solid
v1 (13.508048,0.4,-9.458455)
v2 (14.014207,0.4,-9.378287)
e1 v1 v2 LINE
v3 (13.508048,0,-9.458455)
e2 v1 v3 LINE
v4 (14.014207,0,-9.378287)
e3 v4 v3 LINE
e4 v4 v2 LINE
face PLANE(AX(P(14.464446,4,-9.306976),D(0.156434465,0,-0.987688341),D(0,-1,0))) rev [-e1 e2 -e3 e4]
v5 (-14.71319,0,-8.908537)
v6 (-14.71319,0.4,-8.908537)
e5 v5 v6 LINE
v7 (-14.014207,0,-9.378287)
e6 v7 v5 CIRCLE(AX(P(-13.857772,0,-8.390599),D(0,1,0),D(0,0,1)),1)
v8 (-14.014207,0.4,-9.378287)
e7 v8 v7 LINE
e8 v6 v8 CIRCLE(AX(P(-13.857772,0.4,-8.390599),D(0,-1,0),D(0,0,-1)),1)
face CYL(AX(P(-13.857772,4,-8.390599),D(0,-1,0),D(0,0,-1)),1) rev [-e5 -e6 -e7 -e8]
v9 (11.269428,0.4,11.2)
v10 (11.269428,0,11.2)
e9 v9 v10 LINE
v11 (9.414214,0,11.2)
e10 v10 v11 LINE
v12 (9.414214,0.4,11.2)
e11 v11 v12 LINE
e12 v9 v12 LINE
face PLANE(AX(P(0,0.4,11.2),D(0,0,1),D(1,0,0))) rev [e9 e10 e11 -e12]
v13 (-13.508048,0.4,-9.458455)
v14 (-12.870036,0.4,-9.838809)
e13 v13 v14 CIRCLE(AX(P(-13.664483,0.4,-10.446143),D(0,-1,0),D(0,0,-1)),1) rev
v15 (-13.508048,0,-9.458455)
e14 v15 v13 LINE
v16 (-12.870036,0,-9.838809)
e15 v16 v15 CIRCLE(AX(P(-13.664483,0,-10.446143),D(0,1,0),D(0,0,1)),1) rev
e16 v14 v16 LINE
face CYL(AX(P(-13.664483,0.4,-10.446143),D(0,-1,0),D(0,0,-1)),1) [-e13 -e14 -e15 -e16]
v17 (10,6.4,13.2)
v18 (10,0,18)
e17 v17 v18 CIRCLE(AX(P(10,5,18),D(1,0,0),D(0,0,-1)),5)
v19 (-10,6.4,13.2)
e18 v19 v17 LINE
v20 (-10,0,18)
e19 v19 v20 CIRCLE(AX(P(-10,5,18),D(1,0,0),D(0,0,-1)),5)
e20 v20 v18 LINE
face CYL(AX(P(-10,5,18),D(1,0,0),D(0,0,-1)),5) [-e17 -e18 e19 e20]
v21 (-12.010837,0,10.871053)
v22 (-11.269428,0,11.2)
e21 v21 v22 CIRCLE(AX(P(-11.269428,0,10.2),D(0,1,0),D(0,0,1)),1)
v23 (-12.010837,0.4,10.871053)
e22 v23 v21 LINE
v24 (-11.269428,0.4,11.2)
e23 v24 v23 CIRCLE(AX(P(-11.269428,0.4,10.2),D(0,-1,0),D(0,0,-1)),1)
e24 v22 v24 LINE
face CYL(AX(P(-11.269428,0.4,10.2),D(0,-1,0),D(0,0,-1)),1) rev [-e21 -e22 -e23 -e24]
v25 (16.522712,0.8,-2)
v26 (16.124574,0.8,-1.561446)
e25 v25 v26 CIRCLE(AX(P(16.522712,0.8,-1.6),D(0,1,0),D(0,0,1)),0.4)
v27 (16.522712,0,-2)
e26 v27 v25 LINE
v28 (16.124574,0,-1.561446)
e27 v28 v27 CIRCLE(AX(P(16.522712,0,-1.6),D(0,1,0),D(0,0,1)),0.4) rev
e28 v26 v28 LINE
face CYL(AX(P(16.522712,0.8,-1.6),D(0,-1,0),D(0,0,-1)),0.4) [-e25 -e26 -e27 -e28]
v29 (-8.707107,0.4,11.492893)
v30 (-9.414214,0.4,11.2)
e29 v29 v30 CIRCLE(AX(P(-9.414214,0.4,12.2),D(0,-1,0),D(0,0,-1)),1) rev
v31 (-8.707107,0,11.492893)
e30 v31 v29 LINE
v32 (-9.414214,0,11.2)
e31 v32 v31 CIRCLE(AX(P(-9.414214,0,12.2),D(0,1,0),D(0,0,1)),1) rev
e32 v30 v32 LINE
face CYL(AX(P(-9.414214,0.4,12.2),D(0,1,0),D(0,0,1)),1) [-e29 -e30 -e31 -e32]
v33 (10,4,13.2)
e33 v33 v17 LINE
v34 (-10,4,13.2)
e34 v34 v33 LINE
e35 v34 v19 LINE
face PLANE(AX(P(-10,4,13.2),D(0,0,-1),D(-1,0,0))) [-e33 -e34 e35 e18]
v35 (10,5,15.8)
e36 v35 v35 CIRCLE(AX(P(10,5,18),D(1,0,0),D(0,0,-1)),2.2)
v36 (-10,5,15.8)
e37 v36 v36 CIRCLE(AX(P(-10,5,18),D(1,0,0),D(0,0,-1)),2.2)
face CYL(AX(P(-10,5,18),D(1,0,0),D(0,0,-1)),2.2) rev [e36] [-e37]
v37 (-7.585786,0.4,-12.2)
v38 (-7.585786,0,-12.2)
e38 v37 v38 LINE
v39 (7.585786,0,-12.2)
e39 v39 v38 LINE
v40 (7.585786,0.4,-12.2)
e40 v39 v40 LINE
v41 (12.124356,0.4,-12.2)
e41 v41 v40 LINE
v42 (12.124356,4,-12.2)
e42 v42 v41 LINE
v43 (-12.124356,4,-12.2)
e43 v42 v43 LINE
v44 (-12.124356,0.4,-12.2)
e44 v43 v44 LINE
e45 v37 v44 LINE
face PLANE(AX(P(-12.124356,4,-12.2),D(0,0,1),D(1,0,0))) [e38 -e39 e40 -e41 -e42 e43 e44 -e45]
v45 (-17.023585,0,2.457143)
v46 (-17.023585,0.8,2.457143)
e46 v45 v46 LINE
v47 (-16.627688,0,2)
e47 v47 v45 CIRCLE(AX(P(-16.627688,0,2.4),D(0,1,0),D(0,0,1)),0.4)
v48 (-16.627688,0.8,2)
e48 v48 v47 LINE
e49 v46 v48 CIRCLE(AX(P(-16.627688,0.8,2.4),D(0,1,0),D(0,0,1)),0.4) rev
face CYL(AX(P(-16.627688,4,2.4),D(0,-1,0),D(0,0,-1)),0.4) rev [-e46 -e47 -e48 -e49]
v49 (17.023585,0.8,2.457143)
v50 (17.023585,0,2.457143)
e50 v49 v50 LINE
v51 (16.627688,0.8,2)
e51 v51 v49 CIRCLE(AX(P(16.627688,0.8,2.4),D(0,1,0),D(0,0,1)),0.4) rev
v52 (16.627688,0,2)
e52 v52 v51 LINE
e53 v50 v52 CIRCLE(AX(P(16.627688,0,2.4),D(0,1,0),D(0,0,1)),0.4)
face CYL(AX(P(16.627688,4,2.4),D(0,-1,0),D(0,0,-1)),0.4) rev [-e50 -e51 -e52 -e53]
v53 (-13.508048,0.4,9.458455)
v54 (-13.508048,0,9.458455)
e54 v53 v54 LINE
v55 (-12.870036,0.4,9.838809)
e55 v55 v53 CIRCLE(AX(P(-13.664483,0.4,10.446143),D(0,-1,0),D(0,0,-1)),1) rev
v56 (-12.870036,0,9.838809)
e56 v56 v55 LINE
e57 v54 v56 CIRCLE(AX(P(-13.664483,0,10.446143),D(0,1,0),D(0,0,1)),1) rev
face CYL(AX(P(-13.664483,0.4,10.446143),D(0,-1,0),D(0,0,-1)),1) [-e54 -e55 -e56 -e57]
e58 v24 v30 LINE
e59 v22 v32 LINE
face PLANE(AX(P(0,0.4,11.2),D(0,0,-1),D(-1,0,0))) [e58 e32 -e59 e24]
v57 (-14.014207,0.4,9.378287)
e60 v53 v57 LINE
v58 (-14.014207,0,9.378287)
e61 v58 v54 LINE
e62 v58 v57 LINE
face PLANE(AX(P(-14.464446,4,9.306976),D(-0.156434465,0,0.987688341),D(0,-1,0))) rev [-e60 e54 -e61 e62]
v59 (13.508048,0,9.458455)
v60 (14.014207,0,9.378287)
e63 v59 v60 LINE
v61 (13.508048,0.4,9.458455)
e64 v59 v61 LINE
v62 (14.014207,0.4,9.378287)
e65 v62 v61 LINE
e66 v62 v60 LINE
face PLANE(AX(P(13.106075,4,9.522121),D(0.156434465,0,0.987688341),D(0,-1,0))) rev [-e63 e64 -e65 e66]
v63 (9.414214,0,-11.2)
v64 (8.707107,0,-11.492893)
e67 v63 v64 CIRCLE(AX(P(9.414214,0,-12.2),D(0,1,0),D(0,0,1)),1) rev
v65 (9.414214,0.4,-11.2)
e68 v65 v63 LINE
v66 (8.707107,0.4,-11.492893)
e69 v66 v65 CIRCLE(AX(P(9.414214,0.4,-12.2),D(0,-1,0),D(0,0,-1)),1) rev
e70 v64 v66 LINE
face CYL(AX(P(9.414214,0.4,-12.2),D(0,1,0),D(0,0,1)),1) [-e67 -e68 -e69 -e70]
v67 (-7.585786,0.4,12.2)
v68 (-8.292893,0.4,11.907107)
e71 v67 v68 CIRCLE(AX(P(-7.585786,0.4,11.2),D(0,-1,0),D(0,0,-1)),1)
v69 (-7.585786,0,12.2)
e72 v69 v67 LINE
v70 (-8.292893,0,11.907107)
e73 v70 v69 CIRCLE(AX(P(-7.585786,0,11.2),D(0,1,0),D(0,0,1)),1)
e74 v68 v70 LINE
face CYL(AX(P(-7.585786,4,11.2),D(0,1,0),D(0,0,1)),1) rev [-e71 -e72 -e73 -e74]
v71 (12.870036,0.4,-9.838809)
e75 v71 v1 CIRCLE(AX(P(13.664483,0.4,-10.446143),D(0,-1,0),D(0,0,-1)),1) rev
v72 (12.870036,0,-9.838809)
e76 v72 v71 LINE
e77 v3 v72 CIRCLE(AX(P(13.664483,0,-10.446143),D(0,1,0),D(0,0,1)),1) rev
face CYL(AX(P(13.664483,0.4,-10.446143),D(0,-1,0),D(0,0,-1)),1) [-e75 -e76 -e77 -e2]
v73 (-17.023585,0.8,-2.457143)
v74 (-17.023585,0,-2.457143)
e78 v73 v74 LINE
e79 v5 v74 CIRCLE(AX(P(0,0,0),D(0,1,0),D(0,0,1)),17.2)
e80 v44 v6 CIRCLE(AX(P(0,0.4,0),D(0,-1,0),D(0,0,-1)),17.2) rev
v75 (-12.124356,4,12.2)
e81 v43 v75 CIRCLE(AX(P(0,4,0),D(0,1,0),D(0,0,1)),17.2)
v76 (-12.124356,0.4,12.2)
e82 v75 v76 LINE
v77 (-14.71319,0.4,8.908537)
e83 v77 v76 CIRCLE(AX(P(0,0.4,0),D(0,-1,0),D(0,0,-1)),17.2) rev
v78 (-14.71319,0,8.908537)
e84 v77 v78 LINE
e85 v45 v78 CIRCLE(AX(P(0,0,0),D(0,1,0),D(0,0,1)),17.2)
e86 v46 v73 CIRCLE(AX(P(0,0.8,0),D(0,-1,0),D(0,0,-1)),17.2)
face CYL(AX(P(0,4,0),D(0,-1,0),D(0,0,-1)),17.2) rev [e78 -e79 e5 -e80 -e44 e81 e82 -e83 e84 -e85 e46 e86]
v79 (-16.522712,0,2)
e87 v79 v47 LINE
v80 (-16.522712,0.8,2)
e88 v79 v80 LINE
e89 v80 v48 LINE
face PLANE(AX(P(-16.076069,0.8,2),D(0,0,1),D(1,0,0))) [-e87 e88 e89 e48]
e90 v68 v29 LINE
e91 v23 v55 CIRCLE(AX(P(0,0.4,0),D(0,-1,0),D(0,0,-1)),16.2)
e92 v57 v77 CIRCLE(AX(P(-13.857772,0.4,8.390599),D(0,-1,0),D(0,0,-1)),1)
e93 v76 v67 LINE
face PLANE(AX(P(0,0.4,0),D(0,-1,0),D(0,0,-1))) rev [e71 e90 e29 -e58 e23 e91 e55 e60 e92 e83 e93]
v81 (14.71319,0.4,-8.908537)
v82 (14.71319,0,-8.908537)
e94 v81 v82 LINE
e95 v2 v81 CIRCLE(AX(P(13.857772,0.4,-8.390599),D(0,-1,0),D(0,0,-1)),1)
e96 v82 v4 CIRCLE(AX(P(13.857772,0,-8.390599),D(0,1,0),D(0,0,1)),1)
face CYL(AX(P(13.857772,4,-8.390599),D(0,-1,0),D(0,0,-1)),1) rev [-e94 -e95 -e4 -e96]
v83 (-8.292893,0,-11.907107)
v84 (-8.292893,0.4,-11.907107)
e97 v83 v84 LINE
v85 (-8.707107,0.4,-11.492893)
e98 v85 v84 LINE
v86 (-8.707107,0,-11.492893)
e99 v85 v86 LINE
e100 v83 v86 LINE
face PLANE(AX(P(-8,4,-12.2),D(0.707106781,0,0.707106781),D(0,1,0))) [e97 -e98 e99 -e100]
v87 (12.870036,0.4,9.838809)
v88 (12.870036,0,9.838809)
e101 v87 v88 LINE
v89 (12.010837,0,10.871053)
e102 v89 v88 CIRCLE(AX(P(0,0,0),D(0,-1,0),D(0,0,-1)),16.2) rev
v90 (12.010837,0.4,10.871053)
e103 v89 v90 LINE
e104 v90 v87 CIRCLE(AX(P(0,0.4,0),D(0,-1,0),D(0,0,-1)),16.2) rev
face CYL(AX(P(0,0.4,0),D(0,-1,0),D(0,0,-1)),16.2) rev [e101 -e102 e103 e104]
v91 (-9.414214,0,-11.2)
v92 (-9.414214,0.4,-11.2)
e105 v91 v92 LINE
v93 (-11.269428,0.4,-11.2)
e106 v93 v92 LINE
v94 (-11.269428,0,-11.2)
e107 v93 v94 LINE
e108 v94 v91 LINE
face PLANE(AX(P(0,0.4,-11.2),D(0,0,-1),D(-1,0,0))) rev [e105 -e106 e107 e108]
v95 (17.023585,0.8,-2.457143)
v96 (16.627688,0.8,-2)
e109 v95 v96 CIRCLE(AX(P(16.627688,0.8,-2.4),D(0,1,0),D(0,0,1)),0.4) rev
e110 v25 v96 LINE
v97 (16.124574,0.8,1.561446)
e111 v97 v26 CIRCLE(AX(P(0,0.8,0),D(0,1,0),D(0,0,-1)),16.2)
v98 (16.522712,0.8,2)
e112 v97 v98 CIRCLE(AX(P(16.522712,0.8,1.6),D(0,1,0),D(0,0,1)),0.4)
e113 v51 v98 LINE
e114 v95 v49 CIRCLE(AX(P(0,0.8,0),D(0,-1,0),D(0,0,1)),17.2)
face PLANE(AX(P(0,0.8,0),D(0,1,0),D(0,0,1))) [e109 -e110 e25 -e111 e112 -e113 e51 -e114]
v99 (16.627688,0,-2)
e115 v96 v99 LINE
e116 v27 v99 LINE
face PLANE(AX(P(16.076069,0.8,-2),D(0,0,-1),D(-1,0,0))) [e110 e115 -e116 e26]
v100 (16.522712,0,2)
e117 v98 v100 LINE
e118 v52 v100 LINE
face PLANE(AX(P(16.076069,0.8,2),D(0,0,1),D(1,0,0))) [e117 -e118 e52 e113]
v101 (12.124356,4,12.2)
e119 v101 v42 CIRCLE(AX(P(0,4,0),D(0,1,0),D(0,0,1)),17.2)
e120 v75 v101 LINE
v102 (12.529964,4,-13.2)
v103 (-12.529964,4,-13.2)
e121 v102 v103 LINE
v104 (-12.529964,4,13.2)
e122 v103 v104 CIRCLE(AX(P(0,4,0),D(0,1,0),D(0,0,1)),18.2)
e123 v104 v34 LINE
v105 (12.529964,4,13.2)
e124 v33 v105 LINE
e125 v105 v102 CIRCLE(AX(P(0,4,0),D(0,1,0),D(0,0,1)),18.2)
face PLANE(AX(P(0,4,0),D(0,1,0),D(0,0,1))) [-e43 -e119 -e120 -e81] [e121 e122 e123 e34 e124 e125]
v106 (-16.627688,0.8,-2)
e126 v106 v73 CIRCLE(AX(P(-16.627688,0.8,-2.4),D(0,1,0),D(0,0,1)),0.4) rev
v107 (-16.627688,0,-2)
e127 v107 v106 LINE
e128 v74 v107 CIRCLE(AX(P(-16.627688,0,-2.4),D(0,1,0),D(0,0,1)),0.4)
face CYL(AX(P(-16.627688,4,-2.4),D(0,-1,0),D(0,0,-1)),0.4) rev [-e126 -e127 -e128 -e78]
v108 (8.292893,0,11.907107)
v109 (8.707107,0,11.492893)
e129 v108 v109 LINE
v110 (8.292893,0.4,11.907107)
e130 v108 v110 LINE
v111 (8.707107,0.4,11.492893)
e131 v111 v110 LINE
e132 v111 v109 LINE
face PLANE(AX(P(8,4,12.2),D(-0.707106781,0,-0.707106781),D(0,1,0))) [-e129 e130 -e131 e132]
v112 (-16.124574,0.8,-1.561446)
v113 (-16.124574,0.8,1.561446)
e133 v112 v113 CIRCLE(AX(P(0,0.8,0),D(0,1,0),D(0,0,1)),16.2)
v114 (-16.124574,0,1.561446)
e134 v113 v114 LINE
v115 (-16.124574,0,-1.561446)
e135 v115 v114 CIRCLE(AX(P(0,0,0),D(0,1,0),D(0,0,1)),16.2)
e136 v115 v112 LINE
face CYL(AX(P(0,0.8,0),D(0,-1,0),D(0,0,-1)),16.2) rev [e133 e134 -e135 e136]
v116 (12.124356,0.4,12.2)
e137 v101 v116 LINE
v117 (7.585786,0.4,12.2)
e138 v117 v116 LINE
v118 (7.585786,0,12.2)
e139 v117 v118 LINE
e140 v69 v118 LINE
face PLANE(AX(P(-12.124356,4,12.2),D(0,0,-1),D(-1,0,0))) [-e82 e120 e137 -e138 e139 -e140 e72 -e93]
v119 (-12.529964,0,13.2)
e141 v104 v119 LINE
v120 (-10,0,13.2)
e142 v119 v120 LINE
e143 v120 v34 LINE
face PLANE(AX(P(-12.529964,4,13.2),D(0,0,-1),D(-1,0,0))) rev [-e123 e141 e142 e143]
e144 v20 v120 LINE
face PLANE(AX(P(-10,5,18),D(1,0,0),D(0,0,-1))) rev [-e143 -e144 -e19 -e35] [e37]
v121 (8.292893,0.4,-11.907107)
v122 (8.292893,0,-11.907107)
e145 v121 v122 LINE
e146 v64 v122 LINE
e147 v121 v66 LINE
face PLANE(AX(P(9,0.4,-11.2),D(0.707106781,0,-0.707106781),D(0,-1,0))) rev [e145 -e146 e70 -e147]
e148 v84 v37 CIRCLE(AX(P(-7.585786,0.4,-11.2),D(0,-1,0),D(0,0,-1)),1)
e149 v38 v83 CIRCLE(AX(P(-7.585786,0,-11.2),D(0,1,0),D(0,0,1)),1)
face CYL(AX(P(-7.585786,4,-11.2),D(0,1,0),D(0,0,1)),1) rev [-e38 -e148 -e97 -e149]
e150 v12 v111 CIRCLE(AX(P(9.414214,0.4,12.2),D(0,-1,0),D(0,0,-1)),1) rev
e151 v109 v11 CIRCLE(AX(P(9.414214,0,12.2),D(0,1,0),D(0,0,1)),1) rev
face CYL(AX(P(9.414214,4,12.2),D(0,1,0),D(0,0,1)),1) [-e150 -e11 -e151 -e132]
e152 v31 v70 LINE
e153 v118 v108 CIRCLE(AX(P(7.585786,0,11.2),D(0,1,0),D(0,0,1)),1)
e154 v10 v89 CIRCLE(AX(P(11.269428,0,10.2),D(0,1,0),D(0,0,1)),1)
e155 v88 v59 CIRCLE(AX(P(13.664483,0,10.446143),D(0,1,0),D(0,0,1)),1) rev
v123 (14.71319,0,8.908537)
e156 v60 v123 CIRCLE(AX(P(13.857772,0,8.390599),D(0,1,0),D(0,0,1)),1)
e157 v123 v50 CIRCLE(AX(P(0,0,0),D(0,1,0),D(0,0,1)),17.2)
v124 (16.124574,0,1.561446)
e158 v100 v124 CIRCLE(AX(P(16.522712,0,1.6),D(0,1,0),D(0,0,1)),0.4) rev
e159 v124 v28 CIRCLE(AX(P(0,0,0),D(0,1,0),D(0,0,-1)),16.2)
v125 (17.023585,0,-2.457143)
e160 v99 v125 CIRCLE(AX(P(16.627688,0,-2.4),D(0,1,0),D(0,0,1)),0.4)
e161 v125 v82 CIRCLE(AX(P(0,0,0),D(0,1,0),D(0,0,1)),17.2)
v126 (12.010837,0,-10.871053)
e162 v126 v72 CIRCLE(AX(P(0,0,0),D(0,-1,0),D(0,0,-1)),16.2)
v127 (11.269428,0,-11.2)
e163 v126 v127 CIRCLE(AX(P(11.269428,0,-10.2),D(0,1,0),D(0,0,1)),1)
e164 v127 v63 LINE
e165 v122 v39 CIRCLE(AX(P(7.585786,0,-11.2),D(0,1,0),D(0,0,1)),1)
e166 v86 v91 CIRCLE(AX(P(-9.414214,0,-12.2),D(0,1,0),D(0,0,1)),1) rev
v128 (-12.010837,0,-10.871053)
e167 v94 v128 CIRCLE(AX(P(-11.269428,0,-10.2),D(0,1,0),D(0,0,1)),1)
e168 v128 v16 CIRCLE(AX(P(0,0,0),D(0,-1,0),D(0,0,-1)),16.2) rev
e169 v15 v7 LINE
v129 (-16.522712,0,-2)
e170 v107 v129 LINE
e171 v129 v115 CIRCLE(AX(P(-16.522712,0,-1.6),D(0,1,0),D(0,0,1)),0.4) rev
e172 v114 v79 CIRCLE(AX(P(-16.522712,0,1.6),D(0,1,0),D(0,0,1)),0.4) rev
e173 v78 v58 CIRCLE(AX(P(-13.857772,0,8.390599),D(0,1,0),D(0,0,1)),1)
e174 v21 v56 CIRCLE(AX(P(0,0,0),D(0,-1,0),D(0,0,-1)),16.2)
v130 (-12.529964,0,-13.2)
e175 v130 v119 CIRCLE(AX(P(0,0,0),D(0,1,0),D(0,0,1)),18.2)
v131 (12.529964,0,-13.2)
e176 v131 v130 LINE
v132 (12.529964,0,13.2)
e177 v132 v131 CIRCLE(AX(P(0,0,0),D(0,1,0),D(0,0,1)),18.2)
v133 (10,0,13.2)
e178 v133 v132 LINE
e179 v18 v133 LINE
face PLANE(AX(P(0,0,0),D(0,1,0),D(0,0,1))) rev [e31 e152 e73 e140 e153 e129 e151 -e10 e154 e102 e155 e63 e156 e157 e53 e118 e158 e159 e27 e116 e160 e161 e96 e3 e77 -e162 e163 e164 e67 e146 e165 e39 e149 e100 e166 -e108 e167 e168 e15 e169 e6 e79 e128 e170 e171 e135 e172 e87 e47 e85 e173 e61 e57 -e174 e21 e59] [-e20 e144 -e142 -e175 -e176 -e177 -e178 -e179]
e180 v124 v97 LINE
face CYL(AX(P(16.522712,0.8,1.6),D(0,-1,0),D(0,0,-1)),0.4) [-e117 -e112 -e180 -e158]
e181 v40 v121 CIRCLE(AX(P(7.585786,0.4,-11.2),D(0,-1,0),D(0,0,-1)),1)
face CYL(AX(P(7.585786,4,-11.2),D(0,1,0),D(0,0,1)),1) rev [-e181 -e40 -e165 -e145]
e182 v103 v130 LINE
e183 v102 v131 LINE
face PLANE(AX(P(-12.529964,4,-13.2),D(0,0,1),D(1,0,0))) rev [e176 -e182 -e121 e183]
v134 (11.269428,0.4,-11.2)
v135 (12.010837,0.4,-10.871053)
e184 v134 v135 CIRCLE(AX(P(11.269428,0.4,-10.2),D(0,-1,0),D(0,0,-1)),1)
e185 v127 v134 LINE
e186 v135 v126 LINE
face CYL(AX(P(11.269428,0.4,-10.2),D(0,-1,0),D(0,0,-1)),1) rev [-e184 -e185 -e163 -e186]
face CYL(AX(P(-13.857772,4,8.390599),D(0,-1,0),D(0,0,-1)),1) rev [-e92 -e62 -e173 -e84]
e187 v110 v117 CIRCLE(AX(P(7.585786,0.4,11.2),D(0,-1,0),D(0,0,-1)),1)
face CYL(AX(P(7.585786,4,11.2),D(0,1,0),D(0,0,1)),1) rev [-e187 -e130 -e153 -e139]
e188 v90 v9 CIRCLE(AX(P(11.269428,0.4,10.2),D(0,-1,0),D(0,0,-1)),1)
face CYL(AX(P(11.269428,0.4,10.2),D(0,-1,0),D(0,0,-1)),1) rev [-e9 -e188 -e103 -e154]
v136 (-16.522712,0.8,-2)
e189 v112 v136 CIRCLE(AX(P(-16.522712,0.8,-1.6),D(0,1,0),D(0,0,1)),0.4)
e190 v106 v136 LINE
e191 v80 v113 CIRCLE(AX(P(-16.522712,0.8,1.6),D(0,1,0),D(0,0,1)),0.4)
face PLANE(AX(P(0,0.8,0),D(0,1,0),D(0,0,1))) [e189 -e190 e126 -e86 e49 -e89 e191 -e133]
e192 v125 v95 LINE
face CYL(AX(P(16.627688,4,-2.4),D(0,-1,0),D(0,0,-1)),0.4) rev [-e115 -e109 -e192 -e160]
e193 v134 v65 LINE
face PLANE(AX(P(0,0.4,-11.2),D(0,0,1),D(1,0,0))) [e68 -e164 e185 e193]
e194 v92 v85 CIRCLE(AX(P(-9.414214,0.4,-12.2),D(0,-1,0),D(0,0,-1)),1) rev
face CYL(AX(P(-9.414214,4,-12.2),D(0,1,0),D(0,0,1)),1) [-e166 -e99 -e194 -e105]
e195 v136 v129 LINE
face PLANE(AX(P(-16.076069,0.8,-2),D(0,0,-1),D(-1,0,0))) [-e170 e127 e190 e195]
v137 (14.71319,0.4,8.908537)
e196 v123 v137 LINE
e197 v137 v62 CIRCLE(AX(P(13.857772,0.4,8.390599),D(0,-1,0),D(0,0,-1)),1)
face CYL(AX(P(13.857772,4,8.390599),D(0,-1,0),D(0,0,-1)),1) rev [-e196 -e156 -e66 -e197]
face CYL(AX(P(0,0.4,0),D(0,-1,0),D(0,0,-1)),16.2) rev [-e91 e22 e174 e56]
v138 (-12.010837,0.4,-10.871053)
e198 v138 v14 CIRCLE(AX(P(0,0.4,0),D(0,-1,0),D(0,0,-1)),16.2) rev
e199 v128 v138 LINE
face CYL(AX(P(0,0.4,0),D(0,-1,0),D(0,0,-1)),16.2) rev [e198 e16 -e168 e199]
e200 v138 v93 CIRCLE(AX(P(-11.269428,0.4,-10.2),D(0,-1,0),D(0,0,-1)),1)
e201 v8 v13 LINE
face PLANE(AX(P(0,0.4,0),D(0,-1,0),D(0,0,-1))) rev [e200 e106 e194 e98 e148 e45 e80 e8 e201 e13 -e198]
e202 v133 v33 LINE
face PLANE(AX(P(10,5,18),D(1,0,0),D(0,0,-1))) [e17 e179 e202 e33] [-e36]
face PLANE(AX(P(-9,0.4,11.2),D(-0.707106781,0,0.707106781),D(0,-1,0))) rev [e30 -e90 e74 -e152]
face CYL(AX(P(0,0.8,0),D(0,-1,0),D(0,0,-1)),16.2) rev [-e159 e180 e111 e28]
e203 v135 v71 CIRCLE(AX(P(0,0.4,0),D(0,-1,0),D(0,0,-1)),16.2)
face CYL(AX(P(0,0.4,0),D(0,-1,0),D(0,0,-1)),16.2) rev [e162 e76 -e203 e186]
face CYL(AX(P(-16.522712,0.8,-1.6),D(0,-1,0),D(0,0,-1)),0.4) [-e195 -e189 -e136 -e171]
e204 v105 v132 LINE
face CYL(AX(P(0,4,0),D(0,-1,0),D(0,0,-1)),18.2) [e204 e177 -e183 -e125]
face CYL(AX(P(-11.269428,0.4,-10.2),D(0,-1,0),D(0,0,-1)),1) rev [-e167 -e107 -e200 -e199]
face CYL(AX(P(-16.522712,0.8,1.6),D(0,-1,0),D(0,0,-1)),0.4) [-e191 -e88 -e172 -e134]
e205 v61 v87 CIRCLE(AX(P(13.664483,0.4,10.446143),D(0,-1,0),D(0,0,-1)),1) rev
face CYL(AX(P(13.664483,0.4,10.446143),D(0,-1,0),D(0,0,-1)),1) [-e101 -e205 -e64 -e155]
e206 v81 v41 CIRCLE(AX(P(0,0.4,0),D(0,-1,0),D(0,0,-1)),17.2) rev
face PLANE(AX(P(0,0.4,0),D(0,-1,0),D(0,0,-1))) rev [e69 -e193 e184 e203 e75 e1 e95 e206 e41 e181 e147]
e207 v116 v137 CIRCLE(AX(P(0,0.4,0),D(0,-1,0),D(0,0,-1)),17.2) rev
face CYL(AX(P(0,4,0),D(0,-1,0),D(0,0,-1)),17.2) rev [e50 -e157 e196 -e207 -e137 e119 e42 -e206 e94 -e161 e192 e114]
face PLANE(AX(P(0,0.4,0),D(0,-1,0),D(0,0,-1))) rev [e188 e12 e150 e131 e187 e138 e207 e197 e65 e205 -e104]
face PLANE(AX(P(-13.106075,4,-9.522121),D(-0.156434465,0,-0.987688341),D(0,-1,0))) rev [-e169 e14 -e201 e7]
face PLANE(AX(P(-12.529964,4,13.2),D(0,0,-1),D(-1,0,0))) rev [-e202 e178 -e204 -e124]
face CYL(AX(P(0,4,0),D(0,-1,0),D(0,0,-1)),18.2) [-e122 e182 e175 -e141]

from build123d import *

# Parameters (mm, degrees)
EXTRUDE_1_DEPTH      = 4
EXTRUDE_2_DEPTH      = 0.4
CHAMFER_1_SIZE       = 1
FILLET_1_R           = 1
EXTRUDE_3_DEPTH      = 10
EXTRUDE_3_DEPTH_BACK = 10
SKETCH_3_R           = 2.2
EXTRUDE_4_DEPTH      = 0.8
FILLET_2_R           = 0.4


with BuildPart() as part:
    # 草图1 → 凸台-拉伸1 (new body)
    with BuildSketch(Plane(origin=(0, 0, 0), x_dir=(1, 0, 0), z_dir=(0, 1, 0))):
        with BuildLine():
            Line((-12.529964086, 13.2), (12.529964086, 13.2))
            ThreePointArc((12.529964086, 13.2), (18.2, 0), (12.529964086, -13.2))
            Line((12.529964086, -13.2), (-12.529964086, -13.2))
            ThreePointArc((-12.529964086, -13.2), (-18.2, 0), (-12.529964086, 13.2))
        make_face()
        with BuildLine():
            Line((-12.124355653, 12.2), (12.124355653, 12.2))
            ThreePointArc((12.124355653, 12.2), (17.2, 0), (12.124355653, -12.2))
            Line((12.124355653, -12.2), (-12.124355653, -12.2))
            ThreePointArc((-12.124355653, -12.2), (-17.2, 0), (-12.124355653, 12.2))
        make_face(mode=Mode.SUBTRACT)
    extrude(amount=EXTRUDE_1_DEPTH)

    # 草图2 → 凸台-拉伸2 (add)
    with BuildSketch(Plane.XZ):
        with BuildLine():
            Line((-12.124355653, -12.2), (-9, -12.2))
            Line((-9, -12.2), (-9, -11.2))
            Line((-9, -11.2), (-11.704699911, -11.2))
            ThreePointArc((-11.704699911, -11.2), (-12.433722739, -10.384726228), (-13.106075309, -9.522121087))
            Line((-13.106075309, -9.522121087), (-13.915092303, -10.109906339))
            ThreePointArc((-13.915092303, -10.109906339), (-13.061597733, -11.190829489), (-12.124355653, -12.2))
        make_face()
        with BuildLine():
            Line((9, -12.2), (12.124355653, -12.2))
            ThreePointArc((12.124355653, -12.2), (13.061597733, -11.190829489), (13.915092303, -10.109906339))
            Line((13.915092303, -10.109906339), (13.106075309, -9.522121087))
            ThreePointArc((13.106075309, -9.522121087), (12.433722739, -10.384726228), (11.704699911, -11.2))
            Line((11.704699911, -11.2), (9, -11.2))
            Line((9, -11.2), (9, -12.2))
        make_face()
        with BuildLine():
            Line((13.106075309, 9.522121087), (13.915092303, 10.109906339))
            ThreePointArc((13.915092303, 10.109906339), (13.061597733, 11.190829489), (12.124355653, 12.2))
            Line((12.124355653, 12.2), (9, 12.2))
            Line((9, 12.2), (9, 11.2))
            Line((9, 11.2), (11.704699911, 11.2))
            ThreePointArc((11.704699911, 11.2), (12.433722739, 10.384726228), (13.106075309, 9.522121087))
        make_face()
        with BuildLine():
            ThreePointArc((-12.124355653, 12.2), (-13.061597733, 11.190829489), (-13.915092303, 10.109906339))
            Line((-13.915092303, 10.109906339), (-13.106075309, 9.522121087))
            ThreePointArc((-13.106075309, 9.522121087), (-12.433722739, 10.384726228), (-11.704699911, 11.2))
            Line((-11.704699911, 11.2), (-9, 11.2))
            Line((-9, 11.2), (-9, 12.2))
            Line((-9, 12.2), (-12.124355653, 12.2))
        make_face()
    extrude(amount=-EXTRUDE_2_DEPTH)

    # 倒角1
    # the kernel refuses this chamfer: 1 mm, written as the material it adds along each edge
    with BuildSketch(Plane(origin=(9, 0, -12.2), x_dir=(-1, 0, 0), z_dir=(0, 1, 0))) as chamfer_1_piece_1_section:
        Polygon((CHAMFER_1_SIZE, 0), (0, CHAMFER_1_SIZE), (0, 0), align=None)
    chamfer_1_piece_1 = extrude(amount=0.4, mode=Mode.PRIVATE)
    chamfer_1_piece_1 = split(chamfer_1_piece_1, bisect_by=Plane(origin=(9, 0, -11.2), z_dir=(0, 0, -1)), keep=Keep.TOP, mode=Mode.PRIVATE)
    add(chamfer_1_piece_1)
    with BuildSketch(Plane(origin=(13.915092303, 0, -10.109906339), x_dir=(0.5646701289866782, 0, 0.8253166940212516), z_dir=(0, 1, 0))) as chamfer_1_piece_2_section:
        with BuildLine():
            Line((0.972875022, 0), (CHAMFER_1_SIZE * 0.0282812506504, -CHAMFER_1_SIZE * 0.999600005433))
            Line((CHAMFER_1_SIZE * 0.0282812506504, -CHAMFER_1_SIZE * 0.999600005433), (0, 0))
            ThreePointArc((0, 0), (0.500167916, 0.006874426), (0.972875022, 0))
        make_face()
    chamfer_1_piece_2 = extrude(amount=0.4, mode=Mode.PRIVATE)
    chamfer_1_piece_2 = chamfer_1_piece_2 - Plane(origin=(0, 0, 0), x_dir=(0.8090169943749429, 0, -0.5877852522924794), z_dir=(0, -1, 0)) * Cylinder(16.2, 5, mode=Mode.PRIVATE)
    add(chamfer_1_piece_2)
    with BuildSketch(Plane(origin=(13.915092303, 0, 10.109906339), x_dir=(0.5646701289866733, 0, -0.825316694021255), z_dir=(0, 1, 0))) as chamfer_1_piece_3_section:
        with BuildLine():
            Line((0.972875022, 0), (CHAMFER_1_SIZE * 0.0282812506504, CHAMFER_1_SIZE * 0.999600005433))
            Line((CHAMFER_1_SIZE * 0.0282812506504, CHAMFER_1_SIZE * 0.999600005433), (0, 0))
            ThreePointArc((0, 0), (0.500167916, -0.006874426), (0.972875022, 0))
        make_face()
    chamfer_1_piece_3 = extrude(amount=0.4, mode=Mode.PRIVATE)
    chamfer_1_piece_3 = chamfer_1_piece_3 - Plane(origin=(0, 0, 0), x_dir=(0.7225123401678771, 0, 0.6913580246913591), z_dir=(0, -1, 0)) * Cylinder(16.2, 5, mode=Mode.PRIVATE)
    add(chamfer_1_piece_3)
    with BuildSketch(Plane(origin=(9, 0, 12.2), x_dir=(-1, 0, 0), z_dir=(0, 1, 0))) as chamfer_1_piece_4_section:
        Polygon((CHAMFER_1_SIZE, 0), (0, -CHAMFER_1_SIZE), (0, 0), align=None)
    chamfer_1_piece_4 = extrude(amount=0.4, mode=Mode.PRIVATE)
    chamfer_1_piece_4 = split(chamfer_1_piece_4, bisect_by=Plane(origin=(9, 0, 11.2), z_dir=(0, 0, 1)), keep=Keep.TOP, mode=Mode.PRIVATE)
    add(chamfer_1_piece_4)
    with BuildSketch(Plane(origin=(-9, 0, 12.2), x_dir=(1, 0, 0), z_dir=(0, 1, 0))) as chamfer_1_piece_5_section:
        Polygon((CHAMFER_1_SIZE, 0), (0, CHAMFER_1_SIZE), (0, 0), align=None)
    chamfer_1_piece_5 = extrude(amount=0.4, mode=Mode.PRIVATE)
    chamfer_1_piece_5 = split(chamfer_1_piece_5, bisect_by=Plane(origin=(-9, 0, 11.2), z_dir=(0, 0, 1)), keep=Keep.TOP, mode=Mode.PRIVATE)
    add(chamfer_1_piece_5)
    with BuildSketch(Plane(origin=(-13.915092303, 0, 10.109906339), x_dir=(-0.5646701289866741, 0, -0.8253166940212543), z_dir=(0, 1, 0))) as chamfer_1_piece_6_section:
        with BuildLine():
            Line((0.972875022, 0), (CHAMFER_1_SIZE * 0.0282812506504, -CHAMFER_1_SIZE * 0.999600005433))
            Line((CHAMFER_1_SIZE * 0.0282812506504, -CHAMFER_1_SIZE * 0.999600005433), (0, 0))
            ThreePointArc((0, 0), (0.500167916, 0.006874426), (0.972875022, 0))
        make_face()
    chamfer_1_piece_6 = extrude(amount=0.4, mode=Mode.PRIVATE)
    chamfer_1_piece_6 = chamfer_1_piece_6 - Plane(origin=(0, 0, 0), x_dir=(-0.809016994374947, 0, 0.5877852522924738), z_dir=(0, -1, 0)) * Cylinder(16.2, 5, mode=Mode.PRIVATE)
    add(chamfer_1_piece_6)
    with BuildSketch(Plane(origin=(-13.915092303, 0, -10.109906339), x_dir=(-0.5646701289866836, 0, 0.8253166940212479), z_dir=(0, 1, 0))) as chamfer_1_piece_7_section:
        with BuildLine():
            Line((0.972875022, 0), (CHAMFER_1_SIZE * 0.0282812506504, CHAMFER_1_SIZE * 0.999600005433))
            Line((CHAMFER_1_SIZE * 0.0282812506504, CHAMFER_1_SIZE * 0.999600005433), (0, 0))
            ThreePointArc((0, 0), (0.500167916, -0.006874426), (0.972875022, 0))
        make_face()
    chamfer_1_piece_7 = extrude(amount=0.4, mode=Mode.PRIVATE)
    chamfer_1_piece_7 = chamfer_1_piece_7 - Plane(origin=(0, 0, 0), x_dir=(-0.7225123401678729, 0, -0.6913580246913635), z_dir=(0, -1, 0)) * Cylinder(16.2, 5, mode=Mode.PRIVATE)
    add(chamfer_1_piece_7)
    with BuildSketch(Plane(origin=(-9, 0, -12.2), x_dir=(1, 0, 0), z_dir=(0, 1, 0))) as chamfer_1_piece_8_section:
        Polygon((CHAMFER_1_SIZE, 0), (0, -CHAMFER_1_SIZE), (0, 0), align=None)
    chamfer_1_piece_8 = extrude(amount=0.4, mode=Mode.PRIVATE)
    chamfer_1_piece_8 = split(chamfer_1_piece_8, bisect_by=Plane(origin=(-9, 0, -11.2), z_dir=(0, 0, -1)), keep=Keep.TOP, mode=Mode.PRIVATE)
    add(chamfer_1_piece_8)

    # 圆角1
    fillet_1_edges = [part.edges().sort_by_distance(p)[0] for p in [
        (-8, 0.2, -12.2),
        (8, 0.2, -12.2),
        (14.464445768, 0.2, 9.306976342),
        (14.464445768, 0.2, -9.306976342),
        (-8, 0.2, 12.2),
        (8, 0.2, 12.2),
        (-14.464445768, 0.2, -9.306976342),
        (-14.464445768, 0.2, 9.306976342),
        (-11.704699911, 0.2, -11.2),
        (-9, 0.2, -11.2),
        (-13.106075309, 0.2, -9.522121087),
        (11.704699911, 0.2, -11.2),
        (13.106075309, 0.2, -9.522121087),
        (9, 0.2, -11.2),
        (11.704699911, 0.2, 11.2),
        (9, 0.2, 11.2),
        (13.106075309, 0.2, 9.522121087),
        (-11.704699911, 0.2, 11.2),
        (-13.106075309, 0.2, 9.522121087),
        (-9, 0.2, 11.2),
    ]]
    fillet(fillet_1_edges, radius=FILLET_1_R)

    # 草图3 → 凸台-拉伸3 (add, two sides: drawn at the far end of the back side and taken through both)
    with BuildSketch(Plane(origin=(0, 0, 0), x_dir=(0, 0, -1), z_dir=(1, 0, 0)).offset(-EXTRUDE_3_DEPTH_BACK)):
        with BuildLine():
            Line((-18, 0), (-13.2, 0))
            Line((-13.2, 0), (-13.2, 4))
            Line((-13.2, 4), (-13.2, 6.4))
            ThreePointArc((-13.2, 6.4), (-22, 8), (-18, 0))
        make_face()
        with Locations((-18, 5)):
            Circle(SKETCH_3_R, mode=Mode.SUBTRACT)
    extrude(amount=EXTRUDE_3_DEPTH + EXTRUDE_3_DEPTH_BACK)

    # 草图4 → 凸台-拉伸4 (add)
    with BuildSketch(Plane.XZ):
        with BuildLine():
            Line((16.076069171, 2), (17.083325203, 2))
            ThreePointArc((17.083325203, 2), (17.2, 0), (17.083325203, -2))
            Line((17.083325203, -2), (16.076069171, -2))
            ThreePointArc((16.076069171, -2), (16.2, 0), (16.076069171, 2))
        make_face()
        with BuildLine():
            Line((-16.076069171, 2), (-17.083325203, 2))
            ThreePointArc((-17.083325203, 2), (-17.2, 0), (-17.083325203, -2))
            Line((-17.083325203, -2), (-16.076069171, -2))
            ThreePointArc((-16.076069171, -2), (-16.2, 0), (-16.076069171, 2))
        make_face()
    extrude(amount=-EXTRUDE_4_DEPTH)

    # 圆角2
    fillet_2_edges = [part.edges().sort_by_distance(p)[0] for p in [
        (17.083325203, 0.4, 2),
        (17.083325203, 0.4, -2),
        (16.076069171, 0.4, -2),
        (16.076069171, 0.4, 2),
        (-16.076069171, 0.4, 2),
        (-16.076069171, 0.4, -2),
        (-17.083325203, 0.4, -2),
        (-17.083325203, 0.4, 2),
    ]]
    fillet(fillet_2_edges, radius=FILLET_2_R)


solid = part.part
